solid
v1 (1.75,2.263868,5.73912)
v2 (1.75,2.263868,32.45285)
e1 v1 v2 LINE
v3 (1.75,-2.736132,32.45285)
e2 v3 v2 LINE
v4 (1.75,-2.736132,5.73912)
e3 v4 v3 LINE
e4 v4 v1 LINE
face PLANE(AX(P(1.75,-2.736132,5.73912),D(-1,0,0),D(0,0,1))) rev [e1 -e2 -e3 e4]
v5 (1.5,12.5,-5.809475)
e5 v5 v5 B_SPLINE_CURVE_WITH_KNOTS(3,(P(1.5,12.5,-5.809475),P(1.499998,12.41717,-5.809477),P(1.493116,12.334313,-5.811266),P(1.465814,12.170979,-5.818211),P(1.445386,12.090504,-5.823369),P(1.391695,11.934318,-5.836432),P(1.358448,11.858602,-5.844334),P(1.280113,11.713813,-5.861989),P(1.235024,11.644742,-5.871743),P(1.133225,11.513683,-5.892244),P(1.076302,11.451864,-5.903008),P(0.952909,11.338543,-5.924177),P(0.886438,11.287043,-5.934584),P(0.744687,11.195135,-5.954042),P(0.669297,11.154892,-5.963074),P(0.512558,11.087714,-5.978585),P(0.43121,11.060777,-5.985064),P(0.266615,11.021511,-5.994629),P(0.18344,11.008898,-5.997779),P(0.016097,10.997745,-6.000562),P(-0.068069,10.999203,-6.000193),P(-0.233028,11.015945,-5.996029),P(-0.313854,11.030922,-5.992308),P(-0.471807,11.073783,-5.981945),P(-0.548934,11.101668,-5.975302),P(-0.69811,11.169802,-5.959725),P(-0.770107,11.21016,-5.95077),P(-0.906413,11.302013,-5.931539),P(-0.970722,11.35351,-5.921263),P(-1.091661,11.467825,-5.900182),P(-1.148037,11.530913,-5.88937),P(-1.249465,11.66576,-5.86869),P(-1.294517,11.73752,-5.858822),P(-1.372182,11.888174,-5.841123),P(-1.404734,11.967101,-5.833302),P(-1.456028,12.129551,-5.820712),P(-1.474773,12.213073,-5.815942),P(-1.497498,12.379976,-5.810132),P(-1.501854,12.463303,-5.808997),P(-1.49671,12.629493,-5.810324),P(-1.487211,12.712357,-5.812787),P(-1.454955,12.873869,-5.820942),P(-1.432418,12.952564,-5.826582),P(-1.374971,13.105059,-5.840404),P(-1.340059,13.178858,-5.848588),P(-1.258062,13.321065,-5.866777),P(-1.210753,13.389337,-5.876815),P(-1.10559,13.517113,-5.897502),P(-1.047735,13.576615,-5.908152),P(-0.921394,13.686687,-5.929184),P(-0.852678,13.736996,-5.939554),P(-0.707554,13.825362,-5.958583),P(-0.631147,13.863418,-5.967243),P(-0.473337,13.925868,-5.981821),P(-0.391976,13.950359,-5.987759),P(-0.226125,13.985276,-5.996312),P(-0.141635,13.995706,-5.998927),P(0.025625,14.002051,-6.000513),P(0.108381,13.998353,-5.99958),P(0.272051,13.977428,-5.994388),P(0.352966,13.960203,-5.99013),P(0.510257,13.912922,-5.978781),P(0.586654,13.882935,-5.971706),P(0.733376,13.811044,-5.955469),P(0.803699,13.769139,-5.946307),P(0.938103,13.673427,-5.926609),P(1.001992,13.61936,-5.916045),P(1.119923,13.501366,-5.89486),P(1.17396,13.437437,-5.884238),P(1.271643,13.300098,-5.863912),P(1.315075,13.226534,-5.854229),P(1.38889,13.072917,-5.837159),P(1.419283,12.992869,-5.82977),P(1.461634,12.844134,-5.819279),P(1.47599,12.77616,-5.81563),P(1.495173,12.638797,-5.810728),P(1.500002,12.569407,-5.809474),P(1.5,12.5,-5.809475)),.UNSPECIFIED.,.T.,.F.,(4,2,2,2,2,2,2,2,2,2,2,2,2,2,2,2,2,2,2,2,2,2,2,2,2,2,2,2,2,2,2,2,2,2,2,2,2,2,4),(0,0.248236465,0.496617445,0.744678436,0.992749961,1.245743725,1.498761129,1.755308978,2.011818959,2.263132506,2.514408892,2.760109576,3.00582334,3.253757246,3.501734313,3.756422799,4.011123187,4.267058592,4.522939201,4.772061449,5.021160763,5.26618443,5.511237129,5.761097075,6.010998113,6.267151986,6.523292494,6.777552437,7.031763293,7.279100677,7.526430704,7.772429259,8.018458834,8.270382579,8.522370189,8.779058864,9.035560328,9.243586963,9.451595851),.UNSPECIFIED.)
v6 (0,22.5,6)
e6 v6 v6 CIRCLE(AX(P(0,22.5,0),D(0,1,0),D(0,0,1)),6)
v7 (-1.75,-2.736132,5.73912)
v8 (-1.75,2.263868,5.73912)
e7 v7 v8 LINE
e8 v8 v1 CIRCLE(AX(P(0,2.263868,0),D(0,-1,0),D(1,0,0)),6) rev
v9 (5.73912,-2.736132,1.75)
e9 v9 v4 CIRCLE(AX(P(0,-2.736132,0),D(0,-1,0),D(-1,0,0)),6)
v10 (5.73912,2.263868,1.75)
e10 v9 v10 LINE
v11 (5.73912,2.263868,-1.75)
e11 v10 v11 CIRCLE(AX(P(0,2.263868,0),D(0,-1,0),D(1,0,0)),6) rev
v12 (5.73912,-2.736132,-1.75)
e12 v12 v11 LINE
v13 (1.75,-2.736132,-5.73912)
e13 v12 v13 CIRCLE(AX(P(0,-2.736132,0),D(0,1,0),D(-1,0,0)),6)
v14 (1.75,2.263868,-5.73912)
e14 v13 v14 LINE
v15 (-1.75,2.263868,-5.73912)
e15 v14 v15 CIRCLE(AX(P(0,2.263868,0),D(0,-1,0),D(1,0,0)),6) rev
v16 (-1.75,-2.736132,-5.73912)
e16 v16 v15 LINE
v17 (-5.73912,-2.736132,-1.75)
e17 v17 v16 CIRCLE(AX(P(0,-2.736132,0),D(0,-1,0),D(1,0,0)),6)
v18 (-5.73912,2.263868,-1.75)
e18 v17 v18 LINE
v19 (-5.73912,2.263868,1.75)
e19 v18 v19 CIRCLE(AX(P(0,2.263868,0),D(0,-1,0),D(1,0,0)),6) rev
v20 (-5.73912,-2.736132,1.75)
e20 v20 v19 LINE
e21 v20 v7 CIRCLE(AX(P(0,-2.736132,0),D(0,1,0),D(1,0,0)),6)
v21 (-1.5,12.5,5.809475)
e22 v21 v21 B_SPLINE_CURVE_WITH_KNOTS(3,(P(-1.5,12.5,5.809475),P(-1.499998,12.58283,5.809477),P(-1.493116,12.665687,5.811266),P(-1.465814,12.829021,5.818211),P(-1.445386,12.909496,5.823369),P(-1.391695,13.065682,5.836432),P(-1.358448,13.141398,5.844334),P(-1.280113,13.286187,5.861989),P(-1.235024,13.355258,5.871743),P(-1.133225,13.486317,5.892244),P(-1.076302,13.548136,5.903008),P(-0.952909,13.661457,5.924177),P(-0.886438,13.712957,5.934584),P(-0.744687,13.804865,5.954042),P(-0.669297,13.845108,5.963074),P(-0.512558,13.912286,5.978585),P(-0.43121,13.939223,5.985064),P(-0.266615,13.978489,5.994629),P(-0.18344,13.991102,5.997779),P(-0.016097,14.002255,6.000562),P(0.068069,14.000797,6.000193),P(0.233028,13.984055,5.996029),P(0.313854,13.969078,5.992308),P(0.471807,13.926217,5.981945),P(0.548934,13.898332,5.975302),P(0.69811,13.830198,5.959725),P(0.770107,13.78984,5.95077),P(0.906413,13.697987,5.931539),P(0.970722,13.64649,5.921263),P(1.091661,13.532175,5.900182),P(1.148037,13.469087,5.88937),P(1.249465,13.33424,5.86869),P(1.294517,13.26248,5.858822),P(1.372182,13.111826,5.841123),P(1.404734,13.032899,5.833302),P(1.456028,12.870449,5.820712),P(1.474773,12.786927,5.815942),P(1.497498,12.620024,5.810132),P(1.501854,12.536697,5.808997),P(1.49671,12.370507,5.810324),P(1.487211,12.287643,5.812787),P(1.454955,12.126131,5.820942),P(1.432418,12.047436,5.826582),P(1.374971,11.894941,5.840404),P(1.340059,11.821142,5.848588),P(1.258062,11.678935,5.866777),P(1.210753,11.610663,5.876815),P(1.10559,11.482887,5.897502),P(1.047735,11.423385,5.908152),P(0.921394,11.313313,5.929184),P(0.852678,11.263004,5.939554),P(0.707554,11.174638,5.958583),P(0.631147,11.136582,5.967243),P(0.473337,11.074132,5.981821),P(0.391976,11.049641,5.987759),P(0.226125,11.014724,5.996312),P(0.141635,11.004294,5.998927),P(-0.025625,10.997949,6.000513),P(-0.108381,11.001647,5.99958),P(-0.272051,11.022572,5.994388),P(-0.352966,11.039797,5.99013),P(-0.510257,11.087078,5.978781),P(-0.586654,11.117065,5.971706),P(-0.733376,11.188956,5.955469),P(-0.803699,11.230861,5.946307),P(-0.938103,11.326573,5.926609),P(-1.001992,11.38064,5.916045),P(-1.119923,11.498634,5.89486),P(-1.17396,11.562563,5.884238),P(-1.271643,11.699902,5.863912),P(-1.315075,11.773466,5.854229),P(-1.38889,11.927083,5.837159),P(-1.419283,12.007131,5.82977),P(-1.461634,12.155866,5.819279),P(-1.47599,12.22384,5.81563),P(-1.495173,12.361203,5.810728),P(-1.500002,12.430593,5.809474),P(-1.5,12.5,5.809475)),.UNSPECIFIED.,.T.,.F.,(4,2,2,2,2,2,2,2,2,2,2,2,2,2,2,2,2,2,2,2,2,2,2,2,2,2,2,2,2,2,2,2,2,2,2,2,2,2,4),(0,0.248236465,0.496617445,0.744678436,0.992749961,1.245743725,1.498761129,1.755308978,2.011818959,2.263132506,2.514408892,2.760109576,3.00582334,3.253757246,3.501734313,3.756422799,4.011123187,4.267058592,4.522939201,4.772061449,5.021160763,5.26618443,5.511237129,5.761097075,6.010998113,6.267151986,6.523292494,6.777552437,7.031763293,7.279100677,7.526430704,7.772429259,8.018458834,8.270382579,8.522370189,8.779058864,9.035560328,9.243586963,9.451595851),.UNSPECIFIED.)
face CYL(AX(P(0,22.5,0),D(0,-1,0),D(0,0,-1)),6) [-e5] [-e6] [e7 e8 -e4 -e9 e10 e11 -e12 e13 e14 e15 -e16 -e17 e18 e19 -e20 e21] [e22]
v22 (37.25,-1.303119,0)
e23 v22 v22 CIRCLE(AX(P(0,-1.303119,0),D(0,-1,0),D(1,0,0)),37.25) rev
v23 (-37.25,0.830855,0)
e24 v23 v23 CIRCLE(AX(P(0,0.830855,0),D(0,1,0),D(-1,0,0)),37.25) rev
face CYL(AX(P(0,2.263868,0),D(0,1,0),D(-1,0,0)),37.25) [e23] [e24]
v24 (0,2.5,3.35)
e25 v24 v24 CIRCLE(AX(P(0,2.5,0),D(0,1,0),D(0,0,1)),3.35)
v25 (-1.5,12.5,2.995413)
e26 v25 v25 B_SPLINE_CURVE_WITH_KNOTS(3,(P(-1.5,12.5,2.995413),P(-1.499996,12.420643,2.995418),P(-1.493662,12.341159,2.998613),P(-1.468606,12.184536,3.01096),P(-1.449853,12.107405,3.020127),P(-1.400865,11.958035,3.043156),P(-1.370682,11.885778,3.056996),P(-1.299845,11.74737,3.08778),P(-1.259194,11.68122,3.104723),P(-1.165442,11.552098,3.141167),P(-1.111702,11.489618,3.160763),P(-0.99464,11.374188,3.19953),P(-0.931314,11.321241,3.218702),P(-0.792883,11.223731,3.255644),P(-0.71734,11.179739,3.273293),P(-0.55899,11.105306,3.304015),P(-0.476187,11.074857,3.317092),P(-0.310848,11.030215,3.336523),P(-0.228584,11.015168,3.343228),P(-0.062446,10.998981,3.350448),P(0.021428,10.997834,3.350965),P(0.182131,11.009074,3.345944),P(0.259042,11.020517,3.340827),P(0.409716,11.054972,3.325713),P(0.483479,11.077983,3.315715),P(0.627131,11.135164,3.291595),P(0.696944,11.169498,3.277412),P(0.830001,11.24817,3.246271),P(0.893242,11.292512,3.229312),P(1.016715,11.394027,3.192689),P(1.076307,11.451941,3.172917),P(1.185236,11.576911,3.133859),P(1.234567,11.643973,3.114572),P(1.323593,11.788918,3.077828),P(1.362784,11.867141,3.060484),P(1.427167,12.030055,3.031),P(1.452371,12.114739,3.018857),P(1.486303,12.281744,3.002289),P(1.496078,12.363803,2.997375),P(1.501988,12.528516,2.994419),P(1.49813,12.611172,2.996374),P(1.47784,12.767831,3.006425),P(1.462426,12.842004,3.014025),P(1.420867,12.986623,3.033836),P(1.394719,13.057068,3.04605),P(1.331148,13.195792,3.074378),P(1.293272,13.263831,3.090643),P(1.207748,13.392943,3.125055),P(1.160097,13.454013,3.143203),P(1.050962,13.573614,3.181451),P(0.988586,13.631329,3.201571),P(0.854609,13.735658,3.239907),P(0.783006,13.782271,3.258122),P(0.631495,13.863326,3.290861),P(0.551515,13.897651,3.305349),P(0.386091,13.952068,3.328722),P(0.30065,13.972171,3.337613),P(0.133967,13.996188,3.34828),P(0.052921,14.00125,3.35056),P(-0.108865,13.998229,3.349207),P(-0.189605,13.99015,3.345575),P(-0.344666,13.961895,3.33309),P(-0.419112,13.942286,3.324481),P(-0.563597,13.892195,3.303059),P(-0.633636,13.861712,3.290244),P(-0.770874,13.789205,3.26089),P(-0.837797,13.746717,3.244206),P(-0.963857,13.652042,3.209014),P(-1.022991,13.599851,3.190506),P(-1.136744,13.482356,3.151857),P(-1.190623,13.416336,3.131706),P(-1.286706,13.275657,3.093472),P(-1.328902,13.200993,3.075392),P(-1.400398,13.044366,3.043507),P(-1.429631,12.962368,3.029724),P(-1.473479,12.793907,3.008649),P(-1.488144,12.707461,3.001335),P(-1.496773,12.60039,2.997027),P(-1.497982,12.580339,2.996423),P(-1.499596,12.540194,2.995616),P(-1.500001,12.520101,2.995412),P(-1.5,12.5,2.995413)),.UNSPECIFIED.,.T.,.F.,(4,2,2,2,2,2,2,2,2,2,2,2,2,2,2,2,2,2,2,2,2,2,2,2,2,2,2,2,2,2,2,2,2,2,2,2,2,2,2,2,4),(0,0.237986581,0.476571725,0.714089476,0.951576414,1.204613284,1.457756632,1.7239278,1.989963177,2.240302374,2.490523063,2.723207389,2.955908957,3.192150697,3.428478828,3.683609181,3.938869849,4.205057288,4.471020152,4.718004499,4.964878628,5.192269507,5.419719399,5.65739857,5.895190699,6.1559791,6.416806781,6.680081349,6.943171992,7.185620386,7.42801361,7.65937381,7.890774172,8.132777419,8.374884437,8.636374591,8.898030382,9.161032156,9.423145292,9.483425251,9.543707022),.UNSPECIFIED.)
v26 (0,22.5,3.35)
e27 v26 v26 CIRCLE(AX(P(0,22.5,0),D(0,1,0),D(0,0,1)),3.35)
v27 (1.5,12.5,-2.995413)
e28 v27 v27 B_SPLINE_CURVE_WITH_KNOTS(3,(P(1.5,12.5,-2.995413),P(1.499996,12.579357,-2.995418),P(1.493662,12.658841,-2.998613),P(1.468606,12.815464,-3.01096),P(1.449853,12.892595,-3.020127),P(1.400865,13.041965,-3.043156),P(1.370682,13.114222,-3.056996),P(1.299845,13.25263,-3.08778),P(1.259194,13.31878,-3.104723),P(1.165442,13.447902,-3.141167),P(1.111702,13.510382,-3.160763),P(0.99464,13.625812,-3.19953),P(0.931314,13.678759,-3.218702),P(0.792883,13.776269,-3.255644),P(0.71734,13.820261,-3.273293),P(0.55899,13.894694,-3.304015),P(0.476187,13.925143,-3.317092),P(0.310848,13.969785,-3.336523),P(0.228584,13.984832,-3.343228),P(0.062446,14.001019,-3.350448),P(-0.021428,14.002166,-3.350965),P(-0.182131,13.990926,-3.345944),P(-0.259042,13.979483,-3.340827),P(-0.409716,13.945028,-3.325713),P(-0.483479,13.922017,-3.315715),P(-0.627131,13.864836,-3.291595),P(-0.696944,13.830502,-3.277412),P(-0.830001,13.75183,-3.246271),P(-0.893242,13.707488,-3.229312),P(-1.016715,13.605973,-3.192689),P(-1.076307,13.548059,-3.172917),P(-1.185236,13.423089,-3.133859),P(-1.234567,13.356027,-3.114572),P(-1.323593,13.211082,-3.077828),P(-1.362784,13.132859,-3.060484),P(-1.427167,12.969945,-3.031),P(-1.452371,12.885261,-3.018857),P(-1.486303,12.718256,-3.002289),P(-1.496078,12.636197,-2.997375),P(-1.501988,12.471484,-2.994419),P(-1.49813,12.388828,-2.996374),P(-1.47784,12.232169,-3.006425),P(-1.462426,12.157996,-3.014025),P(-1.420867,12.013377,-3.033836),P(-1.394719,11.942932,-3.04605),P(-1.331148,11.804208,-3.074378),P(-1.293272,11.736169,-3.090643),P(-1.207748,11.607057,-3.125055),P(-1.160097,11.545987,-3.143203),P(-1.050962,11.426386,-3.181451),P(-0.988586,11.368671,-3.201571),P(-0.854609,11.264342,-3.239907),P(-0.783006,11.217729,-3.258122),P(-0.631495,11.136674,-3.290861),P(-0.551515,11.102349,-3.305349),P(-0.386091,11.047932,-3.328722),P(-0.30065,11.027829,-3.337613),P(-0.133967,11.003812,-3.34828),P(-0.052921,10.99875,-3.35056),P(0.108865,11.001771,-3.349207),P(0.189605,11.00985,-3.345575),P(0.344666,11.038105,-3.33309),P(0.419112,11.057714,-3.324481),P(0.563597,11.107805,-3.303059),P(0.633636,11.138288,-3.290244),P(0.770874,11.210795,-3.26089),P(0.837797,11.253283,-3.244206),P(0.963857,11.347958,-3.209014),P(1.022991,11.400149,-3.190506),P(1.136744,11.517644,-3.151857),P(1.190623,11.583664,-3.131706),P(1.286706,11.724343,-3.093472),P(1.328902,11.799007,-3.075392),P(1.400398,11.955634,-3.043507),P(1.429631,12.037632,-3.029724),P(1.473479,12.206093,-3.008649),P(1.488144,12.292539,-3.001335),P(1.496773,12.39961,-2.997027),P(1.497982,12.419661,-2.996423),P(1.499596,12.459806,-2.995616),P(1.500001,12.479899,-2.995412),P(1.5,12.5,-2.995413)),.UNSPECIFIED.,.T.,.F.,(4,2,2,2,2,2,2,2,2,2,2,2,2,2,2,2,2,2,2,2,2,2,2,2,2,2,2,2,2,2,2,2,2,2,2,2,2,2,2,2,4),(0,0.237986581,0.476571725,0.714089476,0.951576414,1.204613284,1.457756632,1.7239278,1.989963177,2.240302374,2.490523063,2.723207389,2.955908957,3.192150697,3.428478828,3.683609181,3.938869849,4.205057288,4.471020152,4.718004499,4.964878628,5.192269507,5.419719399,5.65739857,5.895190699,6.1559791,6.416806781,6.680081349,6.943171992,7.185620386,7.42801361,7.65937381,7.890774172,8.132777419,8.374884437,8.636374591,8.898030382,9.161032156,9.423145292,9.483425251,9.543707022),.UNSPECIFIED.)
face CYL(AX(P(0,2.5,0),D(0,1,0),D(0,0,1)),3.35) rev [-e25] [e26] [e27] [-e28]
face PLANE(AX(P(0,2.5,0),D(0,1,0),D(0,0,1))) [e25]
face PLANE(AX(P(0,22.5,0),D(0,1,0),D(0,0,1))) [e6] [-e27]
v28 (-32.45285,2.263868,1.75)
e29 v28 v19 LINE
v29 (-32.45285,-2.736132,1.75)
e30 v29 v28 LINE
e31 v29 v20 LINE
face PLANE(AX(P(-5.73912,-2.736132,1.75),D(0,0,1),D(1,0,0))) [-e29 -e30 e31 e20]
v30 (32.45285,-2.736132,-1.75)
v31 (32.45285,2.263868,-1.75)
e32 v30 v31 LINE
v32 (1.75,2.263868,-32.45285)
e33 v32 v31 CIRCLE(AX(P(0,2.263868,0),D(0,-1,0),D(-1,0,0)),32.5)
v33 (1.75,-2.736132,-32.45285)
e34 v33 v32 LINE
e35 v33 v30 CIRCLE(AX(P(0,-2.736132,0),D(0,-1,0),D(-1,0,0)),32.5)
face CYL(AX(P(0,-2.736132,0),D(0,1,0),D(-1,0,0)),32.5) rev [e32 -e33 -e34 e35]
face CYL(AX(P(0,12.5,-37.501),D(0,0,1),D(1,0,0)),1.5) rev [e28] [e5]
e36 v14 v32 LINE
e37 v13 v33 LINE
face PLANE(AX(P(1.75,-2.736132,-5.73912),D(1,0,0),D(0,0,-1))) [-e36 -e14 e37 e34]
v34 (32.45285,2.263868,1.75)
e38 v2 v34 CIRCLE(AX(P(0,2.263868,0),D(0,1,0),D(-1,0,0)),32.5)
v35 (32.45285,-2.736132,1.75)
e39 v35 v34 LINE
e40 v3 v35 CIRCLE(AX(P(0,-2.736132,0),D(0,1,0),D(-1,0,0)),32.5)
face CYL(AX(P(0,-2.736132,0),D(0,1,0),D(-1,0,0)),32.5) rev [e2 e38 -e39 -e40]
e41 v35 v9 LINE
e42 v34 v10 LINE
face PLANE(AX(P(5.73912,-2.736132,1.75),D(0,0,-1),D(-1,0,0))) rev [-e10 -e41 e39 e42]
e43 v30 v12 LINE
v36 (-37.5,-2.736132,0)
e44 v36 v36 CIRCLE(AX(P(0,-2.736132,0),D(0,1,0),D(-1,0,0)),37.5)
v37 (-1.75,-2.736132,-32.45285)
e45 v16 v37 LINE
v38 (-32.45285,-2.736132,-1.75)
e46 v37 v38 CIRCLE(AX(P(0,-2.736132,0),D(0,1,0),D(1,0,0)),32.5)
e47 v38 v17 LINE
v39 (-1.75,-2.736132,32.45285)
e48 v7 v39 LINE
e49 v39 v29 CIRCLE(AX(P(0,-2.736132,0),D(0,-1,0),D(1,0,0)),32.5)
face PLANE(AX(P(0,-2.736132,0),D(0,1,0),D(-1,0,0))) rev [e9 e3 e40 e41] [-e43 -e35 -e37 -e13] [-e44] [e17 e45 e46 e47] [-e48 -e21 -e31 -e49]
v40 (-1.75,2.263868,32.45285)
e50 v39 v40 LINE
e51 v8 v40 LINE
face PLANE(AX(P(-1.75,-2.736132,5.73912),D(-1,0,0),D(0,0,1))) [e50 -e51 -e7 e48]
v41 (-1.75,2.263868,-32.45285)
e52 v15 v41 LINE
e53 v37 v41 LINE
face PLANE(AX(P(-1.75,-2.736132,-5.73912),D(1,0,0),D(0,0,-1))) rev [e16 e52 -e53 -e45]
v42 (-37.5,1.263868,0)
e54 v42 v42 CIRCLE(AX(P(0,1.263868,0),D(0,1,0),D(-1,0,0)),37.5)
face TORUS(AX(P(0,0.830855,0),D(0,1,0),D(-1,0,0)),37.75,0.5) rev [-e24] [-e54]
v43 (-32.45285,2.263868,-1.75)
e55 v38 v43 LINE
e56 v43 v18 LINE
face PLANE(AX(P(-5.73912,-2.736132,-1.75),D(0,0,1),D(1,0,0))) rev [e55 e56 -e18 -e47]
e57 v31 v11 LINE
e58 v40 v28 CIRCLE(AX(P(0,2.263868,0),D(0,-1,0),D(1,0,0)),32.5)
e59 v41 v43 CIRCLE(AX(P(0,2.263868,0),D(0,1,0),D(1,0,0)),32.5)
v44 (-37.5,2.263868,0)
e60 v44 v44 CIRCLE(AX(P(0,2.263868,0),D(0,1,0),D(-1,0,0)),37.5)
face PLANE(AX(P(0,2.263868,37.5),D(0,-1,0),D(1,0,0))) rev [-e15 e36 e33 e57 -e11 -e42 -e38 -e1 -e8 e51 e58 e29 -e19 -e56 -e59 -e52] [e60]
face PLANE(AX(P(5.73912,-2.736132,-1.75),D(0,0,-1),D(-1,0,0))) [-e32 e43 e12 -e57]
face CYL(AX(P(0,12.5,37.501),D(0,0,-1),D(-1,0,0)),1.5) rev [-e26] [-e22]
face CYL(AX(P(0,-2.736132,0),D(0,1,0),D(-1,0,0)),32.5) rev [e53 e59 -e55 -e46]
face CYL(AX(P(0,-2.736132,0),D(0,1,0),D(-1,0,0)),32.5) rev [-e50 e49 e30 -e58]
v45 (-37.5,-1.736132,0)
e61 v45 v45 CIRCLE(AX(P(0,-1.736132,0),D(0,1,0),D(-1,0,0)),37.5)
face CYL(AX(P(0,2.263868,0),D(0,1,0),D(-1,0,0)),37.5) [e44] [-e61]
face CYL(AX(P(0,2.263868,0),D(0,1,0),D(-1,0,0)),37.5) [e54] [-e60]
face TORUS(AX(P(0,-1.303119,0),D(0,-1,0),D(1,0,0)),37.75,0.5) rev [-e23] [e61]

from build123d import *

# Parameters (mm, degrees)
REVOLVE1_ANGLE                 = 90
BOSS_EXTRUDE2_DEPTH            = 22.5
CUT_EXTRUDE1_DEPTH             = 57.762672959
MIRROR3_START                  = -2.736132077
MIRROR3_DEPTH                  = 5
MIRROR3_START_2                = 2.263867923
MIRROR3_2_DEPTH                = 20.236132077
MIRROR3_3_DEPTH                = 1
MIRROR3_START_3                = 1.263867923
MIRROR3_4_DEPTH                = 1
MIRROR4_START                  = -2.736132077
MIRROR4_DEPTH                  = 5
MIRROR4_START_2                = 2.263867923
MIRROR4_2_DEPTH                = 20.236132077
MIRROR4_3_DEPTH                = 1
MIRROR4_START_3                = 1.263867923
MIRROR4_4_DEPTH                = 1
SKETCH7_R                      = 3.35
CUT_EXTRUDE2_DEPTH             = 20
FILLET9_R                      = 0.5
CUT_EXTRUDE3_REACH             = 59.609
SKETCH8_R                      = 1.5
CUT_EXTRUDE3_DIRECTION_2_REACH = 59.609


# Read off the part's stored shape, not the designer's step: Mirror3, Mirror4
with BuildPart() as part:
    # Sketch1 → Revolve1 (revolve)
    with BuildSketch(Plane.XY):
        Polygon((0, 2.263867923), (0, -2.736132077), (37.5, -2.736132077), (37.5, -1.736132077), (37.25, -1.736132077), (37.25, 1.263867923), (37.5, 1.263867923), (37.5, 2.263867923), align=None)
    revolve(axis=Axis((0, 2.263867923, 0), (0, -1, 0)), revolution_arc=REVOLVE1_ANGLE)

    # Sketch2 → Boss-Extrude2 (add)
    with BuildSketch(Plane(origin=(0, 0, 0), x_dir=(1, 0, 0), z_dir=(0, 1, 0))):
        with BuildLine():
            Line((0, 0), (6, 0))
            ThreePointArc((6, 0), (4.242640687, -4.242640687), (0, -6))
            Line((0, -6), (0, 0))
        make_face()
    extrude(amount=BOSS_EXTRUDE2_DEPTH)

    # Sketch6 → Cut-Extrude1 (cut, through all)
    with BuildSketch(Plane(origin=(0, 2.263867923, 0), x_dir=(1, 0, 0), z_dir=(0, 1, 0))):
        with BuildLine():
            Line((1.75, -5.739120142), (1.75, -32.452850414))
            ThreePointArc((1.75, -32.452850414), (22.980970389, -22.980970389), (32.452850414, -1.75))
            Line((32.452850414, -1.75), (5.739120142, -1.75))
            ThreePointArc((5.739120142, -1.75), (4.242640687, -4.242640687), (1.75, -5.739120142))
        make_face()
    extrude(amount=-CUT_EXTRUDE1_DEPTH, mode=Mode.SUBTRACT)

    # Mirror3 outline → Mirror3 (add)
    with BuildSketch(Plane(origin=(0, 0, 0), x_dir=(1, 0, 0), z_dir=(0, 1, 0)).offset(MIRROR3_START)):
        with BuildLine():
            ThreePointArc((37.25, 0), (26.339727599, 26.339727599), (0, 37.25))
            Line((0, 37.25), (0, 0))
            Line((0, 0), (37.25, 0))
        make_face()
        with BuildLine():
            Line((32.452850414, 1.75), (5.739120142, 1.75))
            ThreePointArc((5.739120142, 1.75), (4.242640687, 4.242640687), (1.75, 5.739120142))
            Line((1.75, 5.739120142), (1.75, 32.452850414))
            ThreePointArc((1.75, 32.452850414), (22.980970389, 22.980970389), (32.452850414, 1.75))
        make_face(mode=Mode.SUBTRACT)
    extrude(amount=MIRROR3_DEPTH)

    # Mirror3 2 outline → Mirror3 2 (add)
    with BuildSketch(Plane(origin=(0, 0, 0), x_dir=(1, 0, 0), z_dir=(0, 1, 0)).offset(MIRROR3_START_2)):
        with BuildLine():
            Line((0, 0), (6, 0))
            ThreePointArc((6, 0), (4.242640687, 4.242640687), (0, 6))
            Line((0, 6), (0, 0))
        make_face()
    extrude(amount=MIRROR3_2_DEPTH)

    # Mirror3 3 outline → Mirror3 3 (add)
    with BuildSketch(Plane(origin=(0, 0, 0), x_dir=(1, 0, 0), z_dir=(0, 1, 0)).offset(MIRROR3_START)):
        with BuildLine():
            Line((37.25, 0), (37.5, 0))
            ThreePointArc((37.5, 0), (26.516504294, 26.516504294), (0, 37.5))
            Line((0, 37.5), (0, 37.25))
            ThreePointArc((0, 37.25), (26.339727599, 26.339727599), (37.25, 0))
        make_face()
    extrude(amount=MIRROR3_3_DEPTH)

    # Mirror3 4 outline → Mirror3 4 (add)
    with BuildSketch(Plane(origin=(0, 0, 0), x_dir=(1, 0, 0), z_dir=(0, 1, 0)).offset(MIRROR3_START_3)):
        with BuildLine():
            Line((37.25, 0), (37.5, 0))
            ThreePointArc((37.5, 0), (26.516504294, 26.516504294), (0, 37.5))
            Line((0, 37.5), (0, 37.25))
            ThreePointArc((0, 37.25), (26.339727599, 26.339727599), (37.25, 0))
        make_face()
    extrude(amount=MIRROR3_4_DEPTH)

    # Mirror4 outline → Mirror4 (add)
    with BuildSketch(Plane(origin=(0, 0, 0), x_dir=(1, 0, 0), z_dir=(0, 1, 0)).offset(MIRROR4_START)):
        with BuildLine():
            ThreePointArc((0, 37.25), (-37.25, 0), (0, -37.25))
            Line((0, -37.25), (0, 37.25))
        make_face()
        with BuildLine():
            Line((-1.75, 32.452850414), (-1.75, 5.739120142))
            ThreePointArc((-1.75, 5.739120142), (-4.242640687, 4.242640687), (-5.739120142, 1.75))
            Line((-5.739120142, 1.75), (-32.452850414, 1.75))
            ThreePointArc((-32.452850414, 1.75), (-22.980970389, 22.980970389), (-1.75, 32.452850414))
        make_face(mode=Mode.SUBTRACT)
        with BuildLine():
            Line((-32.452850414, -1.75), (-5.739120142, -1.75))
            ThreePointArc((-5.739120142, -1.75), (-4.242640687, -4.242640687), (-1.75, -5.739120142))
            Line((-1.75, -5.739120142), (-1.75, -32.452850414))
            ThreePointArc((-1.75, -32.452850414), (-22.980970389, -22.980970389), (-32.452850414, -1.75))
        make_face(mode=Mode.SUBTRACT)
    extrude(amount=MIRROR4_DEPTH)

    # Mirror4 2 outline → Mirror4 2 (add)
    with BuildSketch(Plane(origin=(0, 0, 0), x_dir=(1, 0, 0), z_dir=(0, 1, 0)).offset(MIRROR4_START_2)):
        with BuildLine():
            Line((0, -6), (0, 6))
            ThreePointArc((0, 6), (-6, 0), (0, -6))
        make_face()
    extrude(amount=MIRROR4_2_DEPTH)

    # Mirror4 3 outline → Mirror4 3 (add)
    with BuildSketch(Plane(origin=(0, 0, 0), x_dir=(1, 0, 0), z_dir=(0, 1, 0)).offset(MIRROR4_START)):
        with BuildLine():
            Line((0, 37.25), (0, 37.5))
            ThreePointArc((0, 37.5), (-37.5, 0), (0, -37.5))
            Line((0, -37.5), (0, -37.25))
            ThreePointArc((0, -37.25), (-37.25, 0), (0, 37.25))
        make_face()
    extrude(amount=MIRROR4_3_DEPTH)

    # Mirror4 4 outline → Mirror4 4 (add)
    with BuildSketch(Plane(origin=(0, 0, 0), x_dir=(1, 0, 0), z_dir=(0, 1, 0)).offset(MIRROR4_START_3)):
        with BuildLine():
            Line((0, 37.25), (0, 37.5))
            ThreePointArc((0, 37.5), (-37.5, 0), (0, -37.5))
            Line((0, -37.5), (0, -37.25))
            ThreePointArc((0, -37.25), (-37.25, 0), (0, 37.25))
        make_face()
    extrude(amount=MIRROR4_4_DEPTH)

    # Sketch7 → Cut-Extrude2 (cut)
    with BuildSketch(Plane(origin=(0, 22.5, 0), x_dir=(1, 0, 0), z_dir=(0, 1, 0))):
        with Locations(Location((0, 0, 0), (0, 0, 270))):
            Circle(SKETCH7_R)
    extrude(amount=-CUT_EXTRUDE2_DEPTH, mode=Mode.SUBTRACT)

    # Fillet9
    # the kernel refuses this fillet: 0.5 mm, written as the material it adds along each edge
    with BuildSketch(Plane(origin=(0, 1.263867923, 0), x_dir=(0, 0, 1), z_dir=(1, 0, 0))) as fillet9_piece_1:
        with BuildLine():
            CenterArc((37.75, 0.433012702), FILLET9_R, 180, 60)
            Line((37.5, 0), (37.495, -0.008660254))
            ThreePointArc((37.495, -0.008660254), (37.375, -0.01), (37.25, -0.01))
            Line((37.25, -0.01), (37.24, 0))
            Line((37.24, 0), (37.24, 0.433012702))
            Line((37.24, 0.433012702), (37.25, 0.433012702))
        make_face()
    revolve(axis=Axis((0, 1.263867923, 0), (0, -1, 0)), revolution_arc=180)
    with BuildSketch(Plane(origin=(0, -1.736132077, 0), x_dir=(0, 0, 1), z_dir=(1, 0, 0))) as fillet9_piece_2:
        with BuildLine():
            CenterArc((37.75, -0.433012702), FILLET9_R, 120, 60)
            Line((37.25, -0.433012702), (37.24, -0.433012702))
            Line((37.24, -0.433012702), (37.24, 0))
            Line((37.24, 0), (37.25, 0.01))
            ThreePointArc((37.25, 0.01), (37.375, 0.01), (37.495, 0.008660254))
            Line((37.495, 0.008660254), (37.5, 0))
        make_face()
    revolve(axis=Axis((0, -1.736132077, 0), (0, -1, 0)), revolution_arc=180)
    with BuildSketch(Plane(origin=(0, -1.736132077, 0), x_dir=(1, 0, 0), z_dir=(0, 0, -1))) as fillet9_piece_3:
        with BuildLine():
            CenterArc((37.75, -0.433012702), FILLET9_R, 120, 60)
            Line((37.25, -0.433012702), (37.24, -0.433012702))
            Line((37.24, -0.433012702), (37.24, 0))
            Line((37.24, 0), (37.25, 0.01))
            ThreePointArc((37.25, 0.01), (37.375, 0.01), (37.495, 0.008660254))
            Line((37.495, 0.008660254), (37.5, 0))
        make_face()
    revolve(axis=Axis((0, -1.736132077, 0), (0, -1, 0)), revolution_arc=90)
    with BuildSketch(Plane(origin=(-1e-09, -1.736132077, 1e-09), x_dir=(1.823040450855093e-11, 0, -1.0), z_dir=(-1.0, 0, -1.823040450855093e-11))) as fillet9_piece_4:
        with BuildLine():
            CenterArc((37.750000001, -0.433012702), FILLET9_R, 120, 60)
            Line((37.250000001, -0.433012702), (37.240000001, -0.433012702))
            Line((37.240000001, -0.433012702), (37.240000001, 0))
            Line((37.240000001, 0), (37.250000001, 0.01))
            ThreePointArc((37.250000001, 0.01), (37.375000001, 0.01), (37.495000001, 0.008660254))
            Line((37.495000001, 0.008660254), (37.500000001, 0))
        make_face()
    revolve(axis=Axis((-1e-09, -1.736132077, 1e-09), (0, -1, 0)), revolution_arc=89.999999998)
    with BuildSketch(Plane(origin=(0, 1.263867923, 0), x_dir=(1, 0, 0), z_dir=(0, 0, -1))) as fillet9_piece_5:
        with BuildLine():
            CenterArc((37.75, 0.433012702), FILLET9_R, 180, 60)
            Line((37.5, 0), (37.495, -0.008660254))
            ThreePointArc((37.495, -0.008660254), (37.375, -0.01), (37.25, -0.01))
            Line((37.25, -0.01), (37.24, 0))
            Line((37.24, 0), (37.24, 0.433012702))
            Line((37.24, 0.433012702), (37.25, 0.433012702))
        make_face()
    revolve(axis=Axis((0, 1.263867923, 0), (0, -1, 0)), revolution_arc=90)
    with BuildSketch(Plane(origin=(-1e-09, 1.263867923, 1e-09), x_dir=(1.823040450855093e-11, 0, -1.0), z_dir=(-1.0, 0, -1.823040450855093e-11))) as fillet9_piece_6:
        with BuildLine():
            CenterArc((37.750000001, 0.433012702), FILLET9_R, 180, 60)
            Line((37.500000001, 0), (37.495000001, -0.008660254))
            ThreePointArc((37.495000001, -0.008660254), (37.375000001, -0.01), (37.250000001, -0.01))
            Line((37.250000001, -0.01), (37.240000001, 0))
            Line((37.240000001, 0), (37.240000001, 0.433012702))
            Line((37.240000001, 0.433012702), (37.250000001, 0.433012702))
        make_face()
    revolve(axis=Axis((-1e-09, 1.263867923, 1e-09), (0, -1, 0)), revolution_arc=89.999999998)

    # Sketch8 → Cut-Extrude3 (cut, up to next)
    with BuildSketch(Plane.XY, mode=Mode.PRIVATE) as cut_extrude3_sk1:
        with Locations((0, 12.5)):
            Circle(SKETCH8_R)
    cut_extrude3_tool1 = extrude(cut_extrude3_sk1.sketch, amount=-CUT_EXTRUDE3_REACH, mode=Mode.PRIVATE) & part.part
    add(cut_extrude3_tool1.solids().sort_by_distance((0, 12.5, 0))[0], mode=Mode.SUBTRACT)

    # Sketch8 → Cut-Extrude3 direction 2 (cut, up to next)
    with BuildSketch(Plane.XY, mode=Mode.PRIVATE) as cut_extrude3_direction_2_sk1:
        with Locations((0, 12.5)):
            Circle(SKETCH8_R)
    cut_extrude3_direction_2_tool1 = extrude(cut_extrude3_direction_2_sk1.sketch, amount=CUT_EXTRUDE3_DIRECTION_2_REACH, mode=Mode.PRIVATE) & part.part
    add(cut_extrude3_direction_2_tool1.solids().sort_by_distance((0, 12.5, 0))[0], mode=Mode.SUBTRACT)


solid = part.part
